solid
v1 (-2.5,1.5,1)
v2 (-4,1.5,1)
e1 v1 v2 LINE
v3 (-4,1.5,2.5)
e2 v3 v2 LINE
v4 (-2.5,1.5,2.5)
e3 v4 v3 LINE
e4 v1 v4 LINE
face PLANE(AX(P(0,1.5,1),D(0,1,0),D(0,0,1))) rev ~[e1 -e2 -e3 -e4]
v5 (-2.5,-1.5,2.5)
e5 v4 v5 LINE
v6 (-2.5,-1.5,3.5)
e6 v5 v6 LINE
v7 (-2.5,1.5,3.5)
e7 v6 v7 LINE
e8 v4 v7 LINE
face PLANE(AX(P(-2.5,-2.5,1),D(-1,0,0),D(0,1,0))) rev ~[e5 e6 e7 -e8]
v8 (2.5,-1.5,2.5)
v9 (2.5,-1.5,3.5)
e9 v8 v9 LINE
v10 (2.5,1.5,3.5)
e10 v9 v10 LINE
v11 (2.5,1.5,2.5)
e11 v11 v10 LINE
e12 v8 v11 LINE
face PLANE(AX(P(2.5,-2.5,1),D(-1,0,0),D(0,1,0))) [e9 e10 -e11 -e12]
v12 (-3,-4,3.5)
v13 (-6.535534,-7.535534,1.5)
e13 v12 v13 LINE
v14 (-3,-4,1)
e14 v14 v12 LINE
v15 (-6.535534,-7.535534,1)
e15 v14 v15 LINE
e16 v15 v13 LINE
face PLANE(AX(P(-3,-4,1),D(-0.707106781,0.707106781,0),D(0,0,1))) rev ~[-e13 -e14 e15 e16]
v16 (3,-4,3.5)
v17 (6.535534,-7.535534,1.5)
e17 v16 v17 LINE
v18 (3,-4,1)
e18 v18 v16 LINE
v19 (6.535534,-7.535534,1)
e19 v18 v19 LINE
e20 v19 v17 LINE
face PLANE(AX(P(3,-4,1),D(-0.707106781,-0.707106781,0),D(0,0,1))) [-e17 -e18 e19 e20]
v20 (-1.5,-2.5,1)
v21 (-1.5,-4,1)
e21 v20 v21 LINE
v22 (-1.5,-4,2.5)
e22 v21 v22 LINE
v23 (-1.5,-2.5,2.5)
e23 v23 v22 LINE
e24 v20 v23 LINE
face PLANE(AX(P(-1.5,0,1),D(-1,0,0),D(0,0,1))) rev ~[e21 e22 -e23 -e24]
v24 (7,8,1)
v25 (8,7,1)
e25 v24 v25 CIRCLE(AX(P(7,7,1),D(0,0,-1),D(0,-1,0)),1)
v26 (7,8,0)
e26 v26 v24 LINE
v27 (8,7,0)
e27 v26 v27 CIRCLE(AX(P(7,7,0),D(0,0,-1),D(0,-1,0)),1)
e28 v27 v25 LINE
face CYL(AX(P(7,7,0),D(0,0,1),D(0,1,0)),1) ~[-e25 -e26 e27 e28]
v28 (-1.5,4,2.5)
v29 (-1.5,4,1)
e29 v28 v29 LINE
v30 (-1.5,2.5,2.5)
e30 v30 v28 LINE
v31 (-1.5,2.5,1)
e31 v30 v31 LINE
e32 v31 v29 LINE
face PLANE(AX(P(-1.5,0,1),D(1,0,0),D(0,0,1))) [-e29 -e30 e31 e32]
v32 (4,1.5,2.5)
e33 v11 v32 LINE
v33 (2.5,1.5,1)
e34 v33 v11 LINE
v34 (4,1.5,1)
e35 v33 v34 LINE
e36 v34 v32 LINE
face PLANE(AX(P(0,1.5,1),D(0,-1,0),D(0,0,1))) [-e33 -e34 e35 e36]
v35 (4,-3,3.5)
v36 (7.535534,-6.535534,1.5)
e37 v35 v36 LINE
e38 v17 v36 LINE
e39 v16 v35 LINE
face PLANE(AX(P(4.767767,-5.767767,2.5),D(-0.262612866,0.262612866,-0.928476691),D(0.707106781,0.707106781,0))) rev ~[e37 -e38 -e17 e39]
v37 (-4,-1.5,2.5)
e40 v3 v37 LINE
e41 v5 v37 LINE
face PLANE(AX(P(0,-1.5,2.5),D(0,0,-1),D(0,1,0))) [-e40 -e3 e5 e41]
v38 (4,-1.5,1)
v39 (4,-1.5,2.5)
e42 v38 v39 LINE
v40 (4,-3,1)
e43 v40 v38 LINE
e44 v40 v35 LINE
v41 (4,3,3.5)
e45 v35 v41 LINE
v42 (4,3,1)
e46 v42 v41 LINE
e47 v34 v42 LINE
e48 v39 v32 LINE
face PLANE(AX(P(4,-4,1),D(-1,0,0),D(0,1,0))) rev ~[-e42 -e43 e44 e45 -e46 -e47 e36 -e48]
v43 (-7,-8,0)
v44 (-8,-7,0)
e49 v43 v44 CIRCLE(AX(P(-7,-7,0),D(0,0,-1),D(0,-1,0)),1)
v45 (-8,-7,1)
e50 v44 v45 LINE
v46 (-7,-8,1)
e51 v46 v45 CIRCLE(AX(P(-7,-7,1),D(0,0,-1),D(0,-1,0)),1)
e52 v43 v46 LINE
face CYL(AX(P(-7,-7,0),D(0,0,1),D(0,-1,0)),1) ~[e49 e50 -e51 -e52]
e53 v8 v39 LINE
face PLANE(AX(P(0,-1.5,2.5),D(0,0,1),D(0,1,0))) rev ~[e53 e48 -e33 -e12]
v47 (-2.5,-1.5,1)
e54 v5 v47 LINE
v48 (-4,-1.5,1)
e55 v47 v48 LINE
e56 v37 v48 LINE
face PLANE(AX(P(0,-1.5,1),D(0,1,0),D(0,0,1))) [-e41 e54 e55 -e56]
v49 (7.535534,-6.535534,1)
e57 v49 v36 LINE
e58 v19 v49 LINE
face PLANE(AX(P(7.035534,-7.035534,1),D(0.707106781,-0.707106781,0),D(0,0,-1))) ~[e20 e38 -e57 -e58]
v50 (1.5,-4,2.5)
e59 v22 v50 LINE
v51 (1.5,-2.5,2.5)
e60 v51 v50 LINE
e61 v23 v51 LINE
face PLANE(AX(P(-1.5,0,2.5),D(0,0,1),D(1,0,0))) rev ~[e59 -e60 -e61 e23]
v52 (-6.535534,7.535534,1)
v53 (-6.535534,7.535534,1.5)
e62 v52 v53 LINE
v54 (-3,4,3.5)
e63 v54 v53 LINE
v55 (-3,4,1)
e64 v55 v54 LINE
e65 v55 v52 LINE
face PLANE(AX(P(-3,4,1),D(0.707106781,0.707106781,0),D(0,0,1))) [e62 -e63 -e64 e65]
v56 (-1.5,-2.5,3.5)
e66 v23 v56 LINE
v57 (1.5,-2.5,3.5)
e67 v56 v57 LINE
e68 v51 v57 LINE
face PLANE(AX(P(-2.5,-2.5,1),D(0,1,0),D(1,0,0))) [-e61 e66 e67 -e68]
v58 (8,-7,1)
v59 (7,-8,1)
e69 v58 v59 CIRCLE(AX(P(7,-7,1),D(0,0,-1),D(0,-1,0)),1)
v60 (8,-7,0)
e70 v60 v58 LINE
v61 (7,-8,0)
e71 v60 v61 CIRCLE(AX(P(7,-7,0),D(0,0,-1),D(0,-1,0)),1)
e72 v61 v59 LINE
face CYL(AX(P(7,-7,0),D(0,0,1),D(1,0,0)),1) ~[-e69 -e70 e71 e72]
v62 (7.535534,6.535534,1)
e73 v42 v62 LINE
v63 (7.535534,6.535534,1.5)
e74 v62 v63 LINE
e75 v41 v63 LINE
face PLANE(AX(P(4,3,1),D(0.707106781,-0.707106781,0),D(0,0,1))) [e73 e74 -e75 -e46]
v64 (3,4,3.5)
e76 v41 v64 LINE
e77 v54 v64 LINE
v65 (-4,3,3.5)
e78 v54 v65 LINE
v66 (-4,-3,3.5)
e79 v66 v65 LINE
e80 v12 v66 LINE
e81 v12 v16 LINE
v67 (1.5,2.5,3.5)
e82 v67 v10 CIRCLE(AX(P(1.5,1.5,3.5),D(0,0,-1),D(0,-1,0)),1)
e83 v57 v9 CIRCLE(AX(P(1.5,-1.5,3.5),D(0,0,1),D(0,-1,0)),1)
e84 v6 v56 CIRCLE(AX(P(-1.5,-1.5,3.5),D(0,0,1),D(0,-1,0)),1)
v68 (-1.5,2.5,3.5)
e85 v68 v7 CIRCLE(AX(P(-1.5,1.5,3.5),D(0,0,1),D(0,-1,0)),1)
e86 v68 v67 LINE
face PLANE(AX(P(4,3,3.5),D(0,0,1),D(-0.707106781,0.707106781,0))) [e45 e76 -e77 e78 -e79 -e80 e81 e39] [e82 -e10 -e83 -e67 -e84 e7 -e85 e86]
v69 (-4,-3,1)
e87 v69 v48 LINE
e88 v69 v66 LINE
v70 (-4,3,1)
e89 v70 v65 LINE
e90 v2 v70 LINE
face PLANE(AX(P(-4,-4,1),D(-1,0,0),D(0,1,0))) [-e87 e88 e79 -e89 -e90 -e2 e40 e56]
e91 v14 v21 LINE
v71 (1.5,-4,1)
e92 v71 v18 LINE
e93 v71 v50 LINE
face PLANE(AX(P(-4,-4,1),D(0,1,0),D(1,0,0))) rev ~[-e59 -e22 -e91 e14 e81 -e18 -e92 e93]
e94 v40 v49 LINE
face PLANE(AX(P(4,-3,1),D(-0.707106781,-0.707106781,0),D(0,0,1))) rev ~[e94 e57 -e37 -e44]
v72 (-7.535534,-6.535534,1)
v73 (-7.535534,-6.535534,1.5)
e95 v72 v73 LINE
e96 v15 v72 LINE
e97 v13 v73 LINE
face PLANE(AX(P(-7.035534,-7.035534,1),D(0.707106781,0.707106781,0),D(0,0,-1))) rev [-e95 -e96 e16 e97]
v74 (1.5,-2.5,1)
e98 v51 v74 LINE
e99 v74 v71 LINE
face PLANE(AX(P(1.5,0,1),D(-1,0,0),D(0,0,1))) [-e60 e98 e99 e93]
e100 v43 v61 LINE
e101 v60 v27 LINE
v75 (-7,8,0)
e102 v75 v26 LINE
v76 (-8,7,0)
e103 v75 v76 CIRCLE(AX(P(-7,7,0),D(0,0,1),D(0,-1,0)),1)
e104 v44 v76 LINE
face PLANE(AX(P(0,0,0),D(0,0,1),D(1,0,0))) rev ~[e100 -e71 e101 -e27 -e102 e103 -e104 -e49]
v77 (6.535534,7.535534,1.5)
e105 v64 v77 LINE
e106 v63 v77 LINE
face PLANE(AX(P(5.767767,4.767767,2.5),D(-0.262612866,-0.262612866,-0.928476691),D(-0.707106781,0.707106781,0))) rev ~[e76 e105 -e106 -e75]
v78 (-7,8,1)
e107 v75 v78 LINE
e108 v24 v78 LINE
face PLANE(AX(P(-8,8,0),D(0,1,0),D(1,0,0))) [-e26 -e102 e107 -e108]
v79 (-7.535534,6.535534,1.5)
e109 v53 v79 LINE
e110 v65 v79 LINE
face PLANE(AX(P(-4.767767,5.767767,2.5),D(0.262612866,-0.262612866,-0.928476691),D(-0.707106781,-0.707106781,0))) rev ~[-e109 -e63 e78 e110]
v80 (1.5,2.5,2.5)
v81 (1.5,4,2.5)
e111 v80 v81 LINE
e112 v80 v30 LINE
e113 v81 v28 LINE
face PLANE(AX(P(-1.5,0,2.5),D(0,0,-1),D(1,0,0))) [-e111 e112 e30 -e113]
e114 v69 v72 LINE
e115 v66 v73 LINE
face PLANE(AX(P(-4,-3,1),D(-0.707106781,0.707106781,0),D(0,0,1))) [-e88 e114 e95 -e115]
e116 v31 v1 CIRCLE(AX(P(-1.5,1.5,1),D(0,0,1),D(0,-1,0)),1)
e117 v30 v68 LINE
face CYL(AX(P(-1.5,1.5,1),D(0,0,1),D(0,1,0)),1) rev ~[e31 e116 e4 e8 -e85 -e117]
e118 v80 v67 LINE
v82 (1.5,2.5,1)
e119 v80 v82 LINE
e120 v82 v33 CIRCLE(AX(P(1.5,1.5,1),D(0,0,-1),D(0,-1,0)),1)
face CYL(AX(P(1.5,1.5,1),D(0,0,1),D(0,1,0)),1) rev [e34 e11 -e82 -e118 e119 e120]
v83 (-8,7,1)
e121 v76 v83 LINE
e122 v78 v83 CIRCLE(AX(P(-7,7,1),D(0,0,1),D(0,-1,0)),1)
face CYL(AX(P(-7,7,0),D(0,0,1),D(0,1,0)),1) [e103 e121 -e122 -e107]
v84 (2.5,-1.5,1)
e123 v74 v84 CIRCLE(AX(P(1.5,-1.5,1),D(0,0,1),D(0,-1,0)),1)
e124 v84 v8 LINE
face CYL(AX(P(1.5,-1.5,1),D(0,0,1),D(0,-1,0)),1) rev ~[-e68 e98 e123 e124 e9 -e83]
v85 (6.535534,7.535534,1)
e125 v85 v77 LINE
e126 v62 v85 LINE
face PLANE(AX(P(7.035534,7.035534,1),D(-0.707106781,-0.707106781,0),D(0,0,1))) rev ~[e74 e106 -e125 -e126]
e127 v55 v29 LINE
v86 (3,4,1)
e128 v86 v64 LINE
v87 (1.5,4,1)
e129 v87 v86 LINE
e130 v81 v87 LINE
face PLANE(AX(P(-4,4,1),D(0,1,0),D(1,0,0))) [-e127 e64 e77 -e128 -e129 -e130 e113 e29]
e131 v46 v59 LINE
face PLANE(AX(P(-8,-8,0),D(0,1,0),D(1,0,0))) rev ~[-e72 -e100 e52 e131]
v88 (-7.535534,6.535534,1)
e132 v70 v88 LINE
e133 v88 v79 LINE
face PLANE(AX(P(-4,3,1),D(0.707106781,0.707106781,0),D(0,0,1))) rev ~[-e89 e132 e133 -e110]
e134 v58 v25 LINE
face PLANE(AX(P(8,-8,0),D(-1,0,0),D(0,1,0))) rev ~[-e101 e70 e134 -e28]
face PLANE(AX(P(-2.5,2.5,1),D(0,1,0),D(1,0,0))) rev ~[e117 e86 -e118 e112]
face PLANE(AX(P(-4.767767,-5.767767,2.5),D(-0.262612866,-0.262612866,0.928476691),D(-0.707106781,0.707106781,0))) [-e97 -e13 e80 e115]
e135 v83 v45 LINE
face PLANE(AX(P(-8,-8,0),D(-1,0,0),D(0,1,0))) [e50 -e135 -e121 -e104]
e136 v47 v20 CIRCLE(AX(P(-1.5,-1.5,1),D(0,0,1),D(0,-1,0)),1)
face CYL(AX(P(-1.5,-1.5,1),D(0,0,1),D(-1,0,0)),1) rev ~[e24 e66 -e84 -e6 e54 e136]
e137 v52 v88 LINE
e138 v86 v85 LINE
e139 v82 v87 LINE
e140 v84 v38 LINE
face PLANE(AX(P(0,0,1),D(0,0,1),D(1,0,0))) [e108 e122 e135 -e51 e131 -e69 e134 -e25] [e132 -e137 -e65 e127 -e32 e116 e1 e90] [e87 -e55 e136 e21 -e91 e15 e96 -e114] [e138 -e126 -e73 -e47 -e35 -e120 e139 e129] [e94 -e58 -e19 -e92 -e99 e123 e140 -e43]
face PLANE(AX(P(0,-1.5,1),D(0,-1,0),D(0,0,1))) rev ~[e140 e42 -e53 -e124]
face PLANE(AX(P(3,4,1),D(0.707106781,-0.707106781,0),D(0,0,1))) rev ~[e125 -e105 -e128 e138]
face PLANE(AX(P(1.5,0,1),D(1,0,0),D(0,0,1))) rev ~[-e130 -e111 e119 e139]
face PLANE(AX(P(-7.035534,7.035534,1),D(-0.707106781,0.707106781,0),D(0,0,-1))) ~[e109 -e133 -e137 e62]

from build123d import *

# Parameters (mm, degrees)
F0_W           = 16
F0_H           = 16
F1_DEPTH       = 1
F2_W           = 8
F2_H           = 8
F2_W_2         = 5
F2_H_2         = 5
F3_DEPTH       = 2.5
F4_SIZE        = 1
F5_DEPTH       = 5
F6_DEPTH       = 5
F7_DEPTH       = 5
F8_DEPTH       = 5
F9_SIZE2       = 2
F9_SIZE        = 5
F10_W          = 3
F10_H          = 1.5
F11_DEPTH      = 8.001
F11_DEPTH_BACK = 8.001
F12_W          = 3
F12_H          = 1.5
F13_DEPTH      = 8.001
F13_DEPTH_BACK = 8.001
F14_R          = 1


with BuildPart() as f1:
    # F0 (on Top) → F1 (new body)
    with BuildSketch(Plane.XY):
        Rectangle(F0_W, F0_H)
    extrude(amount=F1_DEPTH)

    # F2 (on face) → F3 (join)
    with BuildSketch(Plane.XY.offset(1)):
        Rectangle(F2_W, F2_H)
        Rectangle(F2_W_2, F2_H_2, mode=Mode.SUBTRACT)
    extrude(amount=F3_DEPTH)

    # F4
    f4_edges = [f1.edges().sort_by_distance(p)[0] for p in [
        (4, 4, 2.25),
        (-4, 4, 2.25),
        (-4, -4, 2.25),
        (4, -4, 2.25),
    ]]
    chamfer(f4_edges, length=F4_SIZE)

    # F5 (add): a face of the model
    f5_faces = [f1.faces().sort_by_distance(p)[0] for p in [
        (-3.5, -3.5, 2.25),
    ]]
    extrude(f5_faces, amount=F5_DEPTH)

    # F6 (add): a face of the model
    f6_faces = [f1.faces().sort_by_distance(p)[0] for p in [
        (3.5, -3.5, 2.25),
    ]]
    extrude(f6_faces, amount=F6_DEPTH)

    # F7 (add): a face of the model
    f7_faces = [f1.faces().sort_by_distance(p)[0] for p in [
        (-3.5, 3.5, 2.25),
    ]]
    extrude(f7_faces, amount=F7_DEPTH)

    # F8 (add): a face of the model
    f8_faces = [f1.faces().sort_by_distance(p)[0] for p in [
        (3.5, 3.5, 2.25),
    ]]
    extrude(f8_faces, amount=F8_DEPTH)

    # F9
    f9_edges = [f1.edges().sort_by_distance(p)[0] for p in [
        (-7.035534, 7.035534, 3.5),
        (-7.035534, -7.035534, 3.5),
        (7.035534, -7.035534, 3.5),
        (7.035534, 7.035534, 3.5),
    ]]
    f9_side = f1.faces().sort_by_distance((0, 3.786863, 3.5))[0]
    chamfer(f9_edges, length=F9_SIZE, length2=F9_SIZE2, reference=f9_side)

    # F10 (on Front) → F11 (cut, two sides)
    with BuildSketch(Plane.XZ) as f11_sk:
        with Locations((0, 1.75)):
            Rectangle(F10_W, F10_H)
    extrude(amount=-F11_DEPTH, mode=Mode.SUBTRACT)
    extrude(f11_sk.sketch, amount=F11_DEPTH_BACK, mode=Mode.SUBTRACT)

    # F12 (on Right) → F13 (cut, two sides)
    with BuildSketch(Plane.YZ) as f13_sk:
        with Locations((0, 1.75)):
            Rectangle(F12_W, F12_H)
    extrude(amount=-F13_DEPTH, mode=Mode.SUBTRACT)
    extrude(f13_sk.sketch, amount=F13_DEPTH_BACK, mode=Mode.SUBTRACT)

    # F14
    f14_edges = [f1.edges().sort_by_distance(p)[0] for p in [
        (-2.5, 2.5, 2.25),
        (-2.5, -2.5, 2.25),
        (2.5, 2.5, 2.25),
        (2.5, -2.5, 2.25),
        (8, -8, 0.5),
        (8, 8, 0.5),
        (-8, -8, 0.5),
        (-8, 8, 0.5),
    ]]
    fillet(f14_edges, radius=F14_R)


solid = f1.part
